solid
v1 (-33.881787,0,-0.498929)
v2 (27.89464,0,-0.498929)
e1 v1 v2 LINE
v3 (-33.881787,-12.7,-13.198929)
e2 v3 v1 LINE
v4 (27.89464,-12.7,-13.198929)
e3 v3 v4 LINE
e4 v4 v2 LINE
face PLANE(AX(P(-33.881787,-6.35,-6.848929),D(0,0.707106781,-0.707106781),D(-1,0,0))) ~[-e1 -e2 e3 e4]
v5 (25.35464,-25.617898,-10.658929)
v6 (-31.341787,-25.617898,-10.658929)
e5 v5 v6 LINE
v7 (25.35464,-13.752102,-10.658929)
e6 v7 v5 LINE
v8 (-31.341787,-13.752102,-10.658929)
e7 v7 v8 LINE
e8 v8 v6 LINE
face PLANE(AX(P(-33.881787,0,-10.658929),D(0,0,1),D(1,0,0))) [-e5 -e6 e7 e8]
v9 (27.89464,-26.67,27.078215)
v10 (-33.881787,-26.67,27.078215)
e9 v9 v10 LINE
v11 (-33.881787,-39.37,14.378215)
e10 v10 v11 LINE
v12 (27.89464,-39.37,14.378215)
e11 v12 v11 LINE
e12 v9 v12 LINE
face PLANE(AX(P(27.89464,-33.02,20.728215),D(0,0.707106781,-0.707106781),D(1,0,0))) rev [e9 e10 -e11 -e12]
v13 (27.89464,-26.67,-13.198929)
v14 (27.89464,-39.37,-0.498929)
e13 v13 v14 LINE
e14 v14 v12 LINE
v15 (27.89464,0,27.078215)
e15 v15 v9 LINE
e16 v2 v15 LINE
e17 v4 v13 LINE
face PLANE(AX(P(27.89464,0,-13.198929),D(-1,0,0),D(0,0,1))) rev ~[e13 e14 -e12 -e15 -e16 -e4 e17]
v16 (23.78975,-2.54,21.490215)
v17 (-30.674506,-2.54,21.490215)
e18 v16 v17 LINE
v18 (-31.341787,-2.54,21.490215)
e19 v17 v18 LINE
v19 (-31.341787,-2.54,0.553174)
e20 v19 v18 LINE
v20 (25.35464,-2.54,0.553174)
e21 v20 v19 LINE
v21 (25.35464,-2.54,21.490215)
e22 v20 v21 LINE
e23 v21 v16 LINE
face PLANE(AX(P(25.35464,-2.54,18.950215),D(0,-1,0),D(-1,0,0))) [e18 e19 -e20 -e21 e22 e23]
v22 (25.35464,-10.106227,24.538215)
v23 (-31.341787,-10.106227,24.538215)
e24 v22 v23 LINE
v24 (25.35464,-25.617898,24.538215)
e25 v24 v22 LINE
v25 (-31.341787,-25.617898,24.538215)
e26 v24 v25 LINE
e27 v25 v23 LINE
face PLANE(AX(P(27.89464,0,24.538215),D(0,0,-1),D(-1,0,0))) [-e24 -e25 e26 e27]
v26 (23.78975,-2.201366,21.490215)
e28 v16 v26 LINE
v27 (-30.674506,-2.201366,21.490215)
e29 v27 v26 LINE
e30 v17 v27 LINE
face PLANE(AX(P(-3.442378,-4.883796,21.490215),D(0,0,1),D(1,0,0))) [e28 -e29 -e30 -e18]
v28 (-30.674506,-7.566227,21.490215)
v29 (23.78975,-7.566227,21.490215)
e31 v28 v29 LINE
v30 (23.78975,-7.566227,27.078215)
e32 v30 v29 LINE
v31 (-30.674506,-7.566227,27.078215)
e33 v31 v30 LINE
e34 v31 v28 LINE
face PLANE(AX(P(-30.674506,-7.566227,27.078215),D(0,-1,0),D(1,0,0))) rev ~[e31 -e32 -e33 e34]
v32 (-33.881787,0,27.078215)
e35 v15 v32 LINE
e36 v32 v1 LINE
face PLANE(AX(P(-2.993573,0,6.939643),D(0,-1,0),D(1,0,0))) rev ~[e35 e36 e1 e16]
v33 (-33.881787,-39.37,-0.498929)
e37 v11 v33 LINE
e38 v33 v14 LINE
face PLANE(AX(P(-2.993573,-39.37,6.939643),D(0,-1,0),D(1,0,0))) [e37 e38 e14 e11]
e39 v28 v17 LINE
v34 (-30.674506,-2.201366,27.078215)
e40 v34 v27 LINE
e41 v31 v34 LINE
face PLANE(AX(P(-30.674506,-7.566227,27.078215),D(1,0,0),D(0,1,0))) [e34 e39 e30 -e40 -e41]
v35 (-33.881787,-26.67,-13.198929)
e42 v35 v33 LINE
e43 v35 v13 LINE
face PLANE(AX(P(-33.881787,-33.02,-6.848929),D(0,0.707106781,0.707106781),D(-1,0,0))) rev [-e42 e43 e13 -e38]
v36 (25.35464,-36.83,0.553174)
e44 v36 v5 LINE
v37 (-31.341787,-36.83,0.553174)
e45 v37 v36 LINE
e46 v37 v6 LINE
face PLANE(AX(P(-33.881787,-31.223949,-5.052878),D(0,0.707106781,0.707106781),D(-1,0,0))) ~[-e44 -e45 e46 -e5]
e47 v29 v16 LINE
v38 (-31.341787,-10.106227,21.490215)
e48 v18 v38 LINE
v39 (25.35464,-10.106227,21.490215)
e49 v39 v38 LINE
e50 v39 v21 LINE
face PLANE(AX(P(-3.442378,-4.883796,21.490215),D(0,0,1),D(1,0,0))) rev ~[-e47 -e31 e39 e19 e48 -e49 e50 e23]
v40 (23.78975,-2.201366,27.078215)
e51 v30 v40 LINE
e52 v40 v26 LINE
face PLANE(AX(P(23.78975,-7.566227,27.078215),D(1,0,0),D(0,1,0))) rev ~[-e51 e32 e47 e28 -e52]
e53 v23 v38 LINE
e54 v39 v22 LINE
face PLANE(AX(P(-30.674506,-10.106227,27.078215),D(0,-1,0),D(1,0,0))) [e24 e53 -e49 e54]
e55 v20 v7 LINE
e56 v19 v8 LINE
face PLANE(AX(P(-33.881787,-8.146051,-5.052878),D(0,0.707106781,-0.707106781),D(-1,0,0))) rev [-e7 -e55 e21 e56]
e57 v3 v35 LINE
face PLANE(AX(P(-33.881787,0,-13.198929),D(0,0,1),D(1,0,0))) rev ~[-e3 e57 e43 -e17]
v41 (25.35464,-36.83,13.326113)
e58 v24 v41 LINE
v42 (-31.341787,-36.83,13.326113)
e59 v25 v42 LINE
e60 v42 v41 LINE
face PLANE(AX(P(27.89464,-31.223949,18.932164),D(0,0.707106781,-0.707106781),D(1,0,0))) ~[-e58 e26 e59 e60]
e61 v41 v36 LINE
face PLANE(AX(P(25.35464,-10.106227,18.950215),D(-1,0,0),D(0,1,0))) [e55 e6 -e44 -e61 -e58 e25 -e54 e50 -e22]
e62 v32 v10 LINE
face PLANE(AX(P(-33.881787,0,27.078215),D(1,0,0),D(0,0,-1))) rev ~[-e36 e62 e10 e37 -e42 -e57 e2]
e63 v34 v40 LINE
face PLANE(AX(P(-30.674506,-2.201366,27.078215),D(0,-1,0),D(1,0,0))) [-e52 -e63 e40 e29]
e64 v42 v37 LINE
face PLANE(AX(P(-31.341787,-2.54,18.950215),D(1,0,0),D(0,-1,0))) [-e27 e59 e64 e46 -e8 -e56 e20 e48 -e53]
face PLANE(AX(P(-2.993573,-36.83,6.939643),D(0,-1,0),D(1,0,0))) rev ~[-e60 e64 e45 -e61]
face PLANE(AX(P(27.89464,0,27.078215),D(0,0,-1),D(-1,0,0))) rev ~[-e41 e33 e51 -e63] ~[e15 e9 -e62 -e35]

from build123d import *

# Parameters (mm, degrees)
F1_DEPTH = 39.37
F2_SIZE  = 12.7
F3_W     = 54.4642563909
F3_H     = 5.3648606408
F4_DEPTH = 5.588
F5_T     = -2.54


# Not quite as in the source:
# - a shell that OpenCascade refuses in one call is made with other operations: the cavity is built on its own and cut out


with BuildPart() as f1:
    # F0 (on Front) → F1 (new body)
    with BuildSketch(Plane.XZ):
        Polygon((-33.8817872107, 27.0782150328), (-33.8817872107, -13.1989289075), (27.8946403414, -13.1989289075), (27.8946403414, 27.0782150328), (0, 27.0782150328), (-9.9332146347, 27.0782150328), align=None)
    extrude(amount=F1_DEPTH)

    # F2
    f2_edges = [f1.edges().sort_by_distance(p)[0] for p in [
        (-2.993573, -39.37, -13.198929),
        (-2.993573, -39.37, 27.078215),
        (-2.993573, 0, -13.198929),
    ]]
    chamfer(f2_edges, length=F2_SIZE)

    # F3 (on face) → F4 (cut)
    with BuildSketch(Plane.XY.offset(27.0782150328)):
        with Locations((-3.4423777834, -4.8837963259)):
            Rectangle(F3_W, F3_H)
    extrude(amount=-F4_DEPTH, mode=Mode.SUBTRACT)

    # F5: a shell. OpenCascade refuses it in one call, so the cavity is built on its own and cut out:
    # the body offset inwards by the wall thickness, plus a prism from it out through each open face.
    f5_core = offset(f1.part, amount=F5_T, kind=Kind.INTERSECTION, mode=Mode.PRIVATE)
    f5_exits = [f5_core.faces().sort_by_distance(p)[0] for p in [
        (-2.993573, -6.323113, 18.950215),
    ]]
    add(f5_core, mode=Mode.SUBTRACT)
    extrude(f5_exits, amount=-F5_T, mode=Mode.SUBTRACT)


solid = f1.part
